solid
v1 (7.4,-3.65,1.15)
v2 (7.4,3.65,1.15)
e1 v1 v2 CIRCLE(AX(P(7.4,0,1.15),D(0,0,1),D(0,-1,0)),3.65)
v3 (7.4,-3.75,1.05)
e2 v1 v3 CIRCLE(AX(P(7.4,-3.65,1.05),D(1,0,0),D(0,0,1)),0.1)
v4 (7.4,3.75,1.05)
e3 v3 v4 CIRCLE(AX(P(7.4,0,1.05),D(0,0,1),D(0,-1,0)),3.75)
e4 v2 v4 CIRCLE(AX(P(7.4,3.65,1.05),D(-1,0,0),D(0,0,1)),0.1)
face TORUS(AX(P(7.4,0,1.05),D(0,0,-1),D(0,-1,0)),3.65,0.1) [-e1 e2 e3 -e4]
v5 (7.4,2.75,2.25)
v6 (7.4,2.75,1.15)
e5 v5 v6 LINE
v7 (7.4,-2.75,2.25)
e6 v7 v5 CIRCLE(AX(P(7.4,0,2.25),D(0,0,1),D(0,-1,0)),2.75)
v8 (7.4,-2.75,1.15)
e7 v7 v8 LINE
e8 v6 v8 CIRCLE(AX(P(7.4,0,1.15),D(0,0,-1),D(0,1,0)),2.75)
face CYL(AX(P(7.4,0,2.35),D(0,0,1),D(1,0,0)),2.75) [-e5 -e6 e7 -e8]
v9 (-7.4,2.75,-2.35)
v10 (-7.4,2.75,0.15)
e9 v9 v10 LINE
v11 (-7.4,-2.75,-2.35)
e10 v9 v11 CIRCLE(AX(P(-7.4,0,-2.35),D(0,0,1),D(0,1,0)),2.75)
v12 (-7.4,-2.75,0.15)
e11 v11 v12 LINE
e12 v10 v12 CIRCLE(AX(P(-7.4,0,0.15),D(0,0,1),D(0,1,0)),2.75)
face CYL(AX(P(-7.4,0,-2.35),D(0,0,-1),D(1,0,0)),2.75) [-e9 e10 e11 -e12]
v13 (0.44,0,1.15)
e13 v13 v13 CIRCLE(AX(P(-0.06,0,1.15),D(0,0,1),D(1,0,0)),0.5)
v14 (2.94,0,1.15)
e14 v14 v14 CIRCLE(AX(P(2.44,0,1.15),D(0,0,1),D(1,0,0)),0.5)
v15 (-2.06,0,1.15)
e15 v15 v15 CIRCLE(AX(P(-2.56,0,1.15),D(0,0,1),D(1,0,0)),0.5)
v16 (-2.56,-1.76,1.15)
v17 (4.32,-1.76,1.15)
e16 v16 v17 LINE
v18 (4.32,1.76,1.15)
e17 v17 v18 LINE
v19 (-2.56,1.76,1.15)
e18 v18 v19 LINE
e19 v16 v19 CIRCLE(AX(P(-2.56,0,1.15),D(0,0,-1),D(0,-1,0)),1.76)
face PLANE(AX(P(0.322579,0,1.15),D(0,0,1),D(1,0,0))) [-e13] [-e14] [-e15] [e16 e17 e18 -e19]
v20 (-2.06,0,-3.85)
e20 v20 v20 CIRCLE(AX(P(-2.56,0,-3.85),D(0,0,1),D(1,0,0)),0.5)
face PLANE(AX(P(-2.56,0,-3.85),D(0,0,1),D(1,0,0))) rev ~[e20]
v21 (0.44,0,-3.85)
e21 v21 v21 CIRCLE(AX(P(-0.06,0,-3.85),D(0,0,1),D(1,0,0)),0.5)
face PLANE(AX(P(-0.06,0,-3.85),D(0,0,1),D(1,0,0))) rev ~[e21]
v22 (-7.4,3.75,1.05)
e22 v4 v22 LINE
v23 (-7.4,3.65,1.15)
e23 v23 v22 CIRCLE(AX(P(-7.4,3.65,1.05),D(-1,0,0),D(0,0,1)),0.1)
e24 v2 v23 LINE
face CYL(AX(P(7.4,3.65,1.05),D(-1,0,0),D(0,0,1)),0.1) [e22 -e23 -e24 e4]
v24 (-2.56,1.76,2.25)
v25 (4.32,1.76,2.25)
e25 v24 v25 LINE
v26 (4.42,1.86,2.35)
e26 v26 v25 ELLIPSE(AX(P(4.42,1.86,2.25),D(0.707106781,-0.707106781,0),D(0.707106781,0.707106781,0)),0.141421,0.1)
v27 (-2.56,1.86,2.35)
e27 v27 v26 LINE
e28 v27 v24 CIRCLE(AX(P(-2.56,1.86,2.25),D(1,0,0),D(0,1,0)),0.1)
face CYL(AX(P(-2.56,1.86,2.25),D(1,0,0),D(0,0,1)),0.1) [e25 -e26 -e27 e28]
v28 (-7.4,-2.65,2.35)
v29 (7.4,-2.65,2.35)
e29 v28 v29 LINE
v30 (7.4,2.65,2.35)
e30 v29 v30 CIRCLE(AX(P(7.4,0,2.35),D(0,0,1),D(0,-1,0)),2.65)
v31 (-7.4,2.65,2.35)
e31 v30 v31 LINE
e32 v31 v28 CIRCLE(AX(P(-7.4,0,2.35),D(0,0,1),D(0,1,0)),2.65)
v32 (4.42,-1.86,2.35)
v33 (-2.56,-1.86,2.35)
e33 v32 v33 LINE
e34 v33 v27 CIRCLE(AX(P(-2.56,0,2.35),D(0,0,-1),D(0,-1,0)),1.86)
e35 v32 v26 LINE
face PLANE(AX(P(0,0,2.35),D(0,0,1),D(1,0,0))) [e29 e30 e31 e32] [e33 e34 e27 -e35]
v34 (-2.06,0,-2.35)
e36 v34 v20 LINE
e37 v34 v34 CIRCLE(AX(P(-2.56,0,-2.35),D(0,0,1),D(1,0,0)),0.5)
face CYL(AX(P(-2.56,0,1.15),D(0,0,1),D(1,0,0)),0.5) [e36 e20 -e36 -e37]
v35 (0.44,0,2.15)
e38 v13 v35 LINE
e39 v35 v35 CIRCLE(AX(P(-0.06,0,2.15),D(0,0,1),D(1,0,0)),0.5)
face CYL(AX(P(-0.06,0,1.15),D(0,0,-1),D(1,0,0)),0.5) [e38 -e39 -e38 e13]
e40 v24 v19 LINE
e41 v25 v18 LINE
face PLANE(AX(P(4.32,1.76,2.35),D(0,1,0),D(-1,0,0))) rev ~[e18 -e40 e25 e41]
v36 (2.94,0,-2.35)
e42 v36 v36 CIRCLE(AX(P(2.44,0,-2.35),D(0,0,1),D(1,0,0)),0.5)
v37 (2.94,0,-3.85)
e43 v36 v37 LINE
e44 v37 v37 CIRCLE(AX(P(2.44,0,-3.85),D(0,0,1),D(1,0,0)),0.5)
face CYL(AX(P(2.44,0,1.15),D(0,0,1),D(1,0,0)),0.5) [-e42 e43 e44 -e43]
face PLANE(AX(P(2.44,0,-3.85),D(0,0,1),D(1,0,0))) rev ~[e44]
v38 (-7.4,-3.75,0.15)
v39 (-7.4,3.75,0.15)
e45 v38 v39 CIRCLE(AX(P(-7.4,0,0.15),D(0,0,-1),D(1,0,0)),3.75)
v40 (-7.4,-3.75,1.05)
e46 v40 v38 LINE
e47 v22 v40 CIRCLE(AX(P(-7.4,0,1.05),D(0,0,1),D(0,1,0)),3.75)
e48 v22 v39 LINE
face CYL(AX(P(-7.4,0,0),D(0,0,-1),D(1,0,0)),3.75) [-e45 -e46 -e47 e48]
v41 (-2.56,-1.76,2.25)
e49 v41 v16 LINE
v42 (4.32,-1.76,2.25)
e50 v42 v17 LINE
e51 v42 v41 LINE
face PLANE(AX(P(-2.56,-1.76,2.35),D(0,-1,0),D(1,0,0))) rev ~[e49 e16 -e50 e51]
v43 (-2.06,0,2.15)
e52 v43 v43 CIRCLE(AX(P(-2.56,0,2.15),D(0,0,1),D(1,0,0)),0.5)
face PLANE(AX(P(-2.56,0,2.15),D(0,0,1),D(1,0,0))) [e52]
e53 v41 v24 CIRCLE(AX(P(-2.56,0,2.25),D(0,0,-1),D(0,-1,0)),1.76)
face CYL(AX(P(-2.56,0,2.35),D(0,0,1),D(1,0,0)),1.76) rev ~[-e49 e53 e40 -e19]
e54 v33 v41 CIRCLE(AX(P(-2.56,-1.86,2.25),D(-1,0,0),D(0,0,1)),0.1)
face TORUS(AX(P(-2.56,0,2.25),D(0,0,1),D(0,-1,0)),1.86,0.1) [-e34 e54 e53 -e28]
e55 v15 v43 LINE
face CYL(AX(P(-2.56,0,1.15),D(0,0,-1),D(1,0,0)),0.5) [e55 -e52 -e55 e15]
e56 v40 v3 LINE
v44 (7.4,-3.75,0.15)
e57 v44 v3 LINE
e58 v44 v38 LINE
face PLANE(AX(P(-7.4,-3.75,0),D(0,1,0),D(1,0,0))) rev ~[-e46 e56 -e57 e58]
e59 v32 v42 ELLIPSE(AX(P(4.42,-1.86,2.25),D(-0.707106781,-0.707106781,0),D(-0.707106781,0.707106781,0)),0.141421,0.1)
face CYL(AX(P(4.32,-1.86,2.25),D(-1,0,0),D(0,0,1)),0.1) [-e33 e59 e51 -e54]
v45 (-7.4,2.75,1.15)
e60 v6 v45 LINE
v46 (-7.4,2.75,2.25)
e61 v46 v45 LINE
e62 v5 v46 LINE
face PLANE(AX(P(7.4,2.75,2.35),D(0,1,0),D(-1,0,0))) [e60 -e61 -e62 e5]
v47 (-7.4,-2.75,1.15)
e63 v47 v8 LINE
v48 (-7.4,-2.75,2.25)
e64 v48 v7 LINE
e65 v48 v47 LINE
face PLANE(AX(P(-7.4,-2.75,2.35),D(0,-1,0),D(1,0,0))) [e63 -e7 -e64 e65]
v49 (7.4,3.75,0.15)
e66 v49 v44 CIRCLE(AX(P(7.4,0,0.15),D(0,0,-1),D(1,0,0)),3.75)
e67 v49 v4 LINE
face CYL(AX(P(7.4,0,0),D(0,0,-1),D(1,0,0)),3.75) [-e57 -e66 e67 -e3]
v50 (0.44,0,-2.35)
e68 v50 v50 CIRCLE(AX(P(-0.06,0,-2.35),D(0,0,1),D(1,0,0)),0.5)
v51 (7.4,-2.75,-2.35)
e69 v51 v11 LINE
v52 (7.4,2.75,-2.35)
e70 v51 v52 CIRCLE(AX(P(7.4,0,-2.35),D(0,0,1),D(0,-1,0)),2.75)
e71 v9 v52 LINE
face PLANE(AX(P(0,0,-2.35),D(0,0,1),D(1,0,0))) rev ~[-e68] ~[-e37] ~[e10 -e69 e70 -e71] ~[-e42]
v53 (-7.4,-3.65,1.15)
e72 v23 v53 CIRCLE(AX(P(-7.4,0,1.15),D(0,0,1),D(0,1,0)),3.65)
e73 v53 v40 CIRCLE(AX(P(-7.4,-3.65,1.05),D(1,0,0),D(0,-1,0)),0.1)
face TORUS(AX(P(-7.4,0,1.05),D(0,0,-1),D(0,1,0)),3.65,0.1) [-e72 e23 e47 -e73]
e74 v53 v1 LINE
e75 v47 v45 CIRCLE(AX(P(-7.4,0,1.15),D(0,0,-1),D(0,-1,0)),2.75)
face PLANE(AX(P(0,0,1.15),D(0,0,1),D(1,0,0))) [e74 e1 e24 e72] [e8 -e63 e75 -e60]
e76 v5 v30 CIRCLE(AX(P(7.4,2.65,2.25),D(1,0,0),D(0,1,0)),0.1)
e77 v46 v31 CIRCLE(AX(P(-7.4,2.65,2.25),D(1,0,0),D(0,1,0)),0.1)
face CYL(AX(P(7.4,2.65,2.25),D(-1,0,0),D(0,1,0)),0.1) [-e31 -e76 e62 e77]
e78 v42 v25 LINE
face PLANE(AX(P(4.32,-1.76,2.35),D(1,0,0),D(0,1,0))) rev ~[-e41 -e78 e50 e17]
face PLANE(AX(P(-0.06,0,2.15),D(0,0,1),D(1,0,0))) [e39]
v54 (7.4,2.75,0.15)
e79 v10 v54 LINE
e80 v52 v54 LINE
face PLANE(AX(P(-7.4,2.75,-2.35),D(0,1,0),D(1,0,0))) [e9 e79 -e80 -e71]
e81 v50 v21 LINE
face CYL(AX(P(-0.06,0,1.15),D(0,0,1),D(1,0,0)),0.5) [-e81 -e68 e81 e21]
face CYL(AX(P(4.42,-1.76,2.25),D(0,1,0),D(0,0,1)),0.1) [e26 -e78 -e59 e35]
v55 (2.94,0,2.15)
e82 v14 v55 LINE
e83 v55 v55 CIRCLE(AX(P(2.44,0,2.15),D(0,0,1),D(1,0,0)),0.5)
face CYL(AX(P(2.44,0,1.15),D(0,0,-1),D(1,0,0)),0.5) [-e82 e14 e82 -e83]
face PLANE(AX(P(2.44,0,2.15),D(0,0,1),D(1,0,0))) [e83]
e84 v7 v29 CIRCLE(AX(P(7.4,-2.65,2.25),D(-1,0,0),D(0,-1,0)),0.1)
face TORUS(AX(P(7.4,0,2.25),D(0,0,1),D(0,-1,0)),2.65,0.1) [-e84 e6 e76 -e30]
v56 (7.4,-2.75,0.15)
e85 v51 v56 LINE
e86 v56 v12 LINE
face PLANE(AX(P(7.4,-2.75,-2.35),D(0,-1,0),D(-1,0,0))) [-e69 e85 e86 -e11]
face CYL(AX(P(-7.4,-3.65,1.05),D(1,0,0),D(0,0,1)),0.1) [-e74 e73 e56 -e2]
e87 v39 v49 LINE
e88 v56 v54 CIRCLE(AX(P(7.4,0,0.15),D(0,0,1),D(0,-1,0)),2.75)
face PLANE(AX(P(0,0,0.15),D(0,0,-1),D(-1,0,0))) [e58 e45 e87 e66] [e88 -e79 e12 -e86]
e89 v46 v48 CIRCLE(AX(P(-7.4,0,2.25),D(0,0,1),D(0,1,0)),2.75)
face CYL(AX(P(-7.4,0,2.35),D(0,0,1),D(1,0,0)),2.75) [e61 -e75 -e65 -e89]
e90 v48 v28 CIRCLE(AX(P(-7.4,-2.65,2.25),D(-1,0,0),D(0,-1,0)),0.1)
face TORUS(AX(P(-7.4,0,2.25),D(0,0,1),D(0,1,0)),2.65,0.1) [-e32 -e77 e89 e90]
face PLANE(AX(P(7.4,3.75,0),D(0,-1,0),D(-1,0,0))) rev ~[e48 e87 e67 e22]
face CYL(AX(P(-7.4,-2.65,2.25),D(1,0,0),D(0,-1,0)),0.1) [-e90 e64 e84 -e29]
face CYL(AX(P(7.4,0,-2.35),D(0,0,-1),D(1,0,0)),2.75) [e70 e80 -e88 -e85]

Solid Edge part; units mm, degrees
sketch "Sketch1" plane through (0, 0, 0) normal (0, 0, 1) x (1, 0, 0)
  line L0 (-7.4, -3.75) -> (7.4, -3.75)
  arc A0 (7.4, -3.75) -> (11.15, 0) centre (7.4, 0) ccw
  arc A1 (11.15, 0) -> (7.4, 3.75) centre (7.4, 0) ccw
  line L1 (7.4, 3.75) -> (-7.4, 3.75)
  arc A2 (-7.4, 3.75) -> (-11.15, 0) centre (-7.4, 0) ccw
  arc A3 (-7.4, -3.75) -> (-11.15, 0) centre (-7.4, 0) cw
  dimension "D1" = 14.8
  dimension "D2" = 7.5
extrude "Protrusion1" add sketch "Sketch1" along normal mid plane 4.7
sketch "Sketch2" plane through (0, 0, 2.35) normal (0, 0, 1) x (1, 0, 0)
  line L0 (-7.4, -2.75) -> (7.4, -2.75)
  arc A0 (7.4, -2.75) -> (10.15, 0) centre (7.4, 0) ccw
  arc A1 (10.15, 0) -> (7.4, 2.75) centre (7.4, 0) ccw
  line L1 (7.4, 2.75) -> (-7.4, 2.75)
  arc A2 (-7.4, 2.75) -> (-10.15, 0) centre (-7.4, 0) ccw
  arc A3 (-7.4, -2.75) -> (-10.15, 0) centre (-7.4, 0) cw
  dimension "D1" = 7.4
extrude "Extrusionsausschnitt_1" cut sketch "Sketch2" against normal blind 1.2 flip side to cut
sketch "Sketch3" plane through (0, 0, -2.35) normal (0, 0, -1) x (1, 0, 0)
  line L0 (-7.4, -2.75) -> (7.4, -2.75)
  arc A0 (7.4, -2.75) -> (10.15, 0) centre (7.4, 0) ccw
  arc A1 (10.15, 0) -> (7.4, 2.75) centre (7.4, 0) ccw
  line L1 (7.4, 2.75) -> (-7.4, 2.75)
  arc A2 (-7.4, 2.75) -> (-10.15, 0) centre (-7.4, 0) ccw
  arc A3 (-7.4, -2.75) -> (-10.15, 0) centre (-7.4, 0) cw
  dimension "D1" = 7.4
extrude "Extrusionsausschnitt_2" cut sketch "Sketch3" against normal blind 2.5 flip side to cut
sketch "Sketch4" plane through (0, 0, 2.35) normal (0, 0, 1) x (1, 0, 0)
  line L0 (-2.56, -1.76) -> (4.32, -1.76)
  line L1 (4.32, -1.76) -> (4.32, 1.76)
  line L2 (4.32, 1.76) -> (-2.56, 1.76)
  arc A0 (-2.56, 1.76) -> (-4.32, 0) centre (-2.56, 0) ccw
  arc A1 (-2.56, -1.76) -> (-4.32, 0) centre (-2.56, 0) cw
  dimension "D1" = 6.88
  dimension "D2" = 3.52
extrude "Extrusionsausschnitt_3" cut sketch "Sketch4" against normal blind 1.2
fillet "Verrundung_1" radius 0.1 11 edges at (0, 3.75, 1.15) (-11.15, 0, 1.15) (0, -3.75, 1.15) (0, 2.75, 2.35) (-10.15, 0, 2.35) (0, -2.75, 2.35) (10.15, 0, 2.35) (-4.32, 0, 2.35) (0.88, -1.76, 2.35) (0.88, 1.76, 2.35) (4.32, 0, 2.35)
sketch "Sketch5" plane through (0, 0, 1.15) normal (0, 0, 1) x (1, 0, 0)
  circle A0 centre (-2.56, 0) radius 0.5
  circle A1 centre (-0.06, 0) radius 0.5
  circle A2 centre (2.44, 0) radius 0.5
  dimension "D1" = 1
  dimension "D2" = 1
  dimension "D3" = 1
  dimension "D4" = 2.5
  dimension "D5" = 2.5
extrude "Extrusionsausprägung_2" add sketch "Sketch5" along normal blind 1 and the other way blind 5
